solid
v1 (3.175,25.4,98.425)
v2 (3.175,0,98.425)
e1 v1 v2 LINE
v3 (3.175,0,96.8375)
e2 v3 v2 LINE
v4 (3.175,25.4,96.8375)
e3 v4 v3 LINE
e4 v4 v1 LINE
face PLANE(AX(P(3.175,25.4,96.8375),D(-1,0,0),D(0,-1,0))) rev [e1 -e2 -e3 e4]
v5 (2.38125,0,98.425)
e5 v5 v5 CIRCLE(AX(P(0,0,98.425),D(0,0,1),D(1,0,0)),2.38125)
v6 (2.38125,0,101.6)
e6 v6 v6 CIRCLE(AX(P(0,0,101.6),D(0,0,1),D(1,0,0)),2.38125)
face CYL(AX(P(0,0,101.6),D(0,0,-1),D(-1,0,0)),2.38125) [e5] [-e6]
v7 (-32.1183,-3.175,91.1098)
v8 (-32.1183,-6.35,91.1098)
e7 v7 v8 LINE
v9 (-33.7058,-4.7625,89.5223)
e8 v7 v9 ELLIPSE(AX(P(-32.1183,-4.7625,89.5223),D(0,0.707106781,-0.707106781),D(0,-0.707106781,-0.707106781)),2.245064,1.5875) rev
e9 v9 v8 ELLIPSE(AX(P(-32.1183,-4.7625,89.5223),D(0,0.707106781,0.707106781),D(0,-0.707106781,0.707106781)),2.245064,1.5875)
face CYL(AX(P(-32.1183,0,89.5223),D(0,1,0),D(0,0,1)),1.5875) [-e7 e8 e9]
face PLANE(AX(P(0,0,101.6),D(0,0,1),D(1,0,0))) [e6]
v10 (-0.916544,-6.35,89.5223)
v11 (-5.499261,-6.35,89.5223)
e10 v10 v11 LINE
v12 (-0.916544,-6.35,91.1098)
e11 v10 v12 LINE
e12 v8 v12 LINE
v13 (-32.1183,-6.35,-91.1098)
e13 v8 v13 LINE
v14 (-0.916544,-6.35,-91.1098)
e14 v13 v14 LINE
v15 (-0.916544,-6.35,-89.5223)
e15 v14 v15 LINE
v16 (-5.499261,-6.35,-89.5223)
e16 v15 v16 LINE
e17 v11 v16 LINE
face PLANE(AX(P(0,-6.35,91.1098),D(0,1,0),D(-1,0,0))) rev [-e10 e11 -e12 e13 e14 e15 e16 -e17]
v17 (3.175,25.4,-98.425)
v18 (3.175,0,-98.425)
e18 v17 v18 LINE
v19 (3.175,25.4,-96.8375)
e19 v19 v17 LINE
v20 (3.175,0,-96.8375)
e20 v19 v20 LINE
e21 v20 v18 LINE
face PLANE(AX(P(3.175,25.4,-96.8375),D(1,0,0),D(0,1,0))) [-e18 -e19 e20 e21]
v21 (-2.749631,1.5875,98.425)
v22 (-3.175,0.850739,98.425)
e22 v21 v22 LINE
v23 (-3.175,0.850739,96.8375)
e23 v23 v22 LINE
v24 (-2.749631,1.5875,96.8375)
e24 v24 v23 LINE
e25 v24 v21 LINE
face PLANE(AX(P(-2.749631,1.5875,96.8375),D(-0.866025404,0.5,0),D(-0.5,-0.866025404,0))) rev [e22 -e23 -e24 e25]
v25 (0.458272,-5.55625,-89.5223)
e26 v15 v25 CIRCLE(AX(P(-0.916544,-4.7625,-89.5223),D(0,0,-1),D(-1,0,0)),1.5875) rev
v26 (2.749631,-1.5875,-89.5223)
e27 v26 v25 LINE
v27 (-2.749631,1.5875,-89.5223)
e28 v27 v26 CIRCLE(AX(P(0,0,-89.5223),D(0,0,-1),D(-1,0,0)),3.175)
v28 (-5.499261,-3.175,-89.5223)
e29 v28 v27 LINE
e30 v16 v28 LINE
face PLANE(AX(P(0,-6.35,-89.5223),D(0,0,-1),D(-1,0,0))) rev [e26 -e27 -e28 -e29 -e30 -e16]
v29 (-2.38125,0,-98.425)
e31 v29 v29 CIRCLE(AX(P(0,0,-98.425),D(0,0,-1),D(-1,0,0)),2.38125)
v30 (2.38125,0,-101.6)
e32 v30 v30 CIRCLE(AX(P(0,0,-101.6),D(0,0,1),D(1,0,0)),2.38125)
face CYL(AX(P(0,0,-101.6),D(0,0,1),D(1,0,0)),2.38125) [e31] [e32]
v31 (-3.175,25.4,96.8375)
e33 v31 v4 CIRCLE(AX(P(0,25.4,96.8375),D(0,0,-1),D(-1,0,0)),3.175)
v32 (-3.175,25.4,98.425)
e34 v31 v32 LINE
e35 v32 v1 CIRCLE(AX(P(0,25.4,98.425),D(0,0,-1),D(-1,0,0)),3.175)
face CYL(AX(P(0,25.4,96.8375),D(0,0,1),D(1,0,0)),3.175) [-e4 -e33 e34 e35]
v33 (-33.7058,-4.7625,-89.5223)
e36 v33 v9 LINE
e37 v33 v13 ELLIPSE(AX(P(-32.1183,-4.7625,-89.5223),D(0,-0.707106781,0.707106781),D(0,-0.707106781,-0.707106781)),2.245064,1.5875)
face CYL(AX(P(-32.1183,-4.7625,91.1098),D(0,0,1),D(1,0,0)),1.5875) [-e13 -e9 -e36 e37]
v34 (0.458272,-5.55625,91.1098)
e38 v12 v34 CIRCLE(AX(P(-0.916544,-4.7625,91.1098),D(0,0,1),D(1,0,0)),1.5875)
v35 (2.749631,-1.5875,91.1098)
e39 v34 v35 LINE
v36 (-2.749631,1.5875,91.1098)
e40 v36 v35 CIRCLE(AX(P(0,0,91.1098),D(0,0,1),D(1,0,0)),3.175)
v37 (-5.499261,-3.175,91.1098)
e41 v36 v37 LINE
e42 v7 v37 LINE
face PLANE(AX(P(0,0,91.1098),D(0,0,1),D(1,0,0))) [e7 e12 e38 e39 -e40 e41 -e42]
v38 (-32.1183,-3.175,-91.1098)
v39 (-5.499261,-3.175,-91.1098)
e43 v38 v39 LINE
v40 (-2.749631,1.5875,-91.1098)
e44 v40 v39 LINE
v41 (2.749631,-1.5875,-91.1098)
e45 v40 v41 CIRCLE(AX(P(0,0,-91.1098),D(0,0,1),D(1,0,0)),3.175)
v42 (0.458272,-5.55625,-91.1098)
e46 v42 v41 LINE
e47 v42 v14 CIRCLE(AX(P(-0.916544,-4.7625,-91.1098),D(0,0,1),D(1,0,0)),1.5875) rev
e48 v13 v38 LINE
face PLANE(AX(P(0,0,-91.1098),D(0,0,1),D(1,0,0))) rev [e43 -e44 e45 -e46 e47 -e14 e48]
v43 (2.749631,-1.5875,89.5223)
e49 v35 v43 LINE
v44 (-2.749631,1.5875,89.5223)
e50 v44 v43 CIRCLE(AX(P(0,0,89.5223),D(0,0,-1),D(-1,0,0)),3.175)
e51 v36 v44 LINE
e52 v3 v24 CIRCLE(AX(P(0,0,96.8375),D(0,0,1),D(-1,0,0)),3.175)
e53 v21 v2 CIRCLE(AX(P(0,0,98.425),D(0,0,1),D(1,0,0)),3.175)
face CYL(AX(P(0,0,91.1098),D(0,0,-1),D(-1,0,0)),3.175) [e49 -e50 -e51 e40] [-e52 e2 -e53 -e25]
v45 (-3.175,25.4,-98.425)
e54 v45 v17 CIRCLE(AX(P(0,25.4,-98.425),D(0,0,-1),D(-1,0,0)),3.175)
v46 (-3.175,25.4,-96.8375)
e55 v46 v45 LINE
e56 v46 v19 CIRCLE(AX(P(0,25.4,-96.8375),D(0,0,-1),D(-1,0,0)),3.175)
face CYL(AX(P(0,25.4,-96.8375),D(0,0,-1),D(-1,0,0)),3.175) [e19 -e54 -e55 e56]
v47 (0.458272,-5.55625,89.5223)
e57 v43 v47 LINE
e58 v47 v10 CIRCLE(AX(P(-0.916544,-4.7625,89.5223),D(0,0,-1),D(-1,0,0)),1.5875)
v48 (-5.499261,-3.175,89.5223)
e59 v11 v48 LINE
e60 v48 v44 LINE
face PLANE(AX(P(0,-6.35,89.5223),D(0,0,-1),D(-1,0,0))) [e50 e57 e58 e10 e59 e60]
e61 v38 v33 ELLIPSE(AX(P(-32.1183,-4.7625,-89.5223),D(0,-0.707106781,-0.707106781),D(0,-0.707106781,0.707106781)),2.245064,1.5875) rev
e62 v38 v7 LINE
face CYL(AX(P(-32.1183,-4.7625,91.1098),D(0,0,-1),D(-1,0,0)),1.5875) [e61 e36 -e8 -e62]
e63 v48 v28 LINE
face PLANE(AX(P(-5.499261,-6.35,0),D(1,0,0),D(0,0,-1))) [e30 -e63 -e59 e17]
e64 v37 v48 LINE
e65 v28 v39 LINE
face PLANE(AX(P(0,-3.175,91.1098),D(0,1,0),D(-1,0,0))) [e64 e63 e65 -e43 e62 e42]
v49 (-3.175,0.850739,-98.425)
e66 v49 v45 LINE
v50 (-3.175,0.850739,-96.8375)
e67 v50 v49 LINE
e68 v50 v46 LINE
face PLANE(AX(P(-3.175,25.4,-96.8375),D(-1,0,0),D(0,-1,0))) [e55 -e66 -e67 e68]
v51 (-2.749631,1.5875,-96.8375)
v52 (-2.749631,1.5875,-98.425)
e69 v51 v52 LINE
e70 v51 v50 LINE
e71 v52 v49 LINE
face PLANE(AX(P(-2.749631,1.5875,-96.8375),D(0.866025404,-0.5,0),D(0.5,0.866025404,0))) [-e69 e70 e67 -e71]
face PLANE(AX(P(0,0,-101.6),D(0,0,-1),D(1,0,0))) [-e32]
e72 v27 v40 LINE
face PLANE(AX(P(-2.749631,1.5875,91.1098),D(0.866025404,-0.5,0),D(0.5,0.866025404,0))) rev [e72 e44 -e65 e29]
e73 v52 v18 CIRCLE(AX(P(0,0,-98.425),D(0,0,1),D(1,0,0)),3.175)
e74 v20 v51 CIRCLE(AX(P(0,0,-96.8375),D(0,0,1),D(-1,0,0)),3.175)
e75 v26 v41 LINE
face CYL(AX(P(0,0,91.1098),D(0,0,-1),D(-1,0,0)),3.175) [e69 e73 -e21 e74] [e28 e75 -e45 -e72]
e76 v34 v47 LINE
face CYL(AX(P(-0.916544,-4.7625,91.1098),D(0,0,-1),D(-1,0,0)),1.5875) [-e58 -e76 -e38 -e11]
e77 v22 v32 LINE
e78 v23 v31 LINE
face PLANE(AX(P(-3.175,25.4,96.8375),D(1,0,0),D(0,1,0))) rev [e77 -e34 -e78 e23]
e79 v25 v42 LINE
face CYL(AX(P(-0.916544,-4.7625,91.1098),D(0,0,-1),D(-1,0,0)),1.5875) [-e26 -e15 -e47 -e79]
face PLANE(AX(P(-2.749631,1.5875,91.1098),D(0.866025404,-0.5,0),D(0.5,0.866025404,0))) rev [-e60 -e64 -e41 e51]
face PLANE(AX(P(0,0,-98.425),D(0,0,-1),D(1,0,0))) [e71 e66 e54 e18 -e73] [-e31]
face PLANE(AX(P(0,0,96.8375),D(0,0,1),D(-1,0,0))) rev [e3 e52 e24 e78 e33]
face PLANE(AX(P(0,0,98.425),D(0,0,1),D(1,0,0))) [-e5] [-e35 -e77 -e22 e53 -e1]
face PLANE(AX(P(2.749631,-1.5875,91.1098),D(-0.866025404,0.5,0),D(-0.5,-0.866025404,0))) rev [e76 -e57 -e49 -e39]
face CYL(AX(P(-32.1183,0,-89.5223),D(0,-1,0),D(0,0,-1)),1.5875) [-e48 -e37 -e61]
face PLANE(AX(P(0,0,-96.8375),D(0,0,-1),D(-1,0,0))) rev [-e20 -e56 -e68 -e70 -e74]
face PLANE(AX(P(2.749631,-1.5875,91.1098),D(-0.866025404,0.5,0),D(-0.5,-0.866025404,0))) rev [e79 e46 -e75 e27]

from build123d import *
from build123d.topology import SkipClean

# Parameters (mm, degrees)
SKETCH1_R               = 3.175
SKETCH1_R_2             = 2.38125
BOSS_EXTRUDE1_DEPTH     = 91.1098
CUT_EXTRUDE1_DEPTH      = 98.351934288
CUT_EXTRUDE1_DEPTH_BACK = 98.351934288
FILLET1_R               = 1.5875
BOSS_EXTRUDE2_START     = 7.3152
SKETCH3_R               = 3.175
BOSS_EXTRUDE2_DEPTH     = 7.3152
SKETCH4_R               = 2.38125
BOSS_EXTRUDE3_DEPTH     = 3.175
BOSS_EXTRUDE4_START     = -1.5875
BOSS_EXTRUDE4_DEPTH     = 1.5875


with BuildPart() as part:
    # Sketch1 → Boss-Extrude1 (new, symmetric)
    # profile 1 of 3: a face of its own
    with BuildSketch(Plane.XY):
        with BuildLine():
            Line((-33.7058, -3.175), (-33.7058, -6.35))
            Line((-33.7058, -6.35), (0, -6.35))
            Line((0, -6.35), (2.749630657, -1.5875))
            ThreePointArc((2.749630657, -1.5875), (-1.5875, -2.749630657), (-2.749630657, 1.5875))
            Line((-2.749630657, 1.5875), (-5.499261314, -3.175))
            Line((-5.499261314, -3.175), (-33.7058, -3.175))
        make_face()
    # profile 2 of 3: a face of its own
    with BuildSketch(Plane.XY):
        Circle(SKETCH1_R)
        Circle(SKETCH1_R_2, mode=Mode.SUBTRACT)
    # profile 3 of 3: a face of its own
    with BuildSketch(Plane.XY):
        Circle(SKETCH1_R_2)
    extrude(amount=BOSS_EXTRUDE1_DEPTH, both=True)

    # Sketch2 → Cut-Extrude1 (cut, two sides: drawn at the far end of the back side and taken through both)
    with BuildSketch(Plane(origin=(0, 0, 0), x_dir=(1, 0, 0), z_dir=(0, 1, 0)).offset(-CUT_EXTRUDE1_DEPTH_BACK)):
        Polygon((-5.499261314, 89.5223), (-5.499261314, -89.5223), (3.175, -89.5223), (3.175, 0), (3.175, 89.5223), align=None)
    extrude(amount=CUT_EXTRUDE1_DEPTH + CUT_EXTRUDE1_DEPTH_BACK, mode=Mode.SUBTRACT)

    # Fillet1
    fillet1_edges = [part.edges().sort_by_distance(p)[0] for p in [
        (0, -6.35, 90.31605),
        (-33.7058, -6.35, 0),
        (-33.7058, -3.175, 0),
        (-33.7058, -4.7625, 91.1098),
        (0, -6.35, -90.31605),
        (-33.7058, -4.7625, -91.1098),
    ]]
    fillet(fillet1_edges, radius=FILLET1_R - 0.0001)  # a hair under: the kernel refuses the full size

    # Sketch3 → Boss-Extrude2 (add)
    with BuildSketch(Plane.XY.offset(91.1098).offset(BOSS_EXTRUDE2_START)):
        with Locations(Location((0, 0, 0), (0, 0, 150))):
            Circle(SKETCH3_R)
    boss_extrude2 = extrude(amount=-BOSS_EXTRUDE2_DEPTH)

    # Sketch4 → Boss-Extrude3 (add)
    with BuildSketch(Plane.XY.offset(98.425)):
        Circle(SKETCH4_R)
    boss_extrude3 = extrude(amount=BOSS_EXTRUDE3_DEPTH)

    # Mirror1: Boss-Extrude2, Boss-Extrude3 across plane
    with SkipClean():  # the faces are left unmerged after this step: merging them gives an invalid solid
        add(boss_extrude2.mirror(Plane.XY))
        add(boss_extrude3.mirror(Plane.XY))

    # Sketch6 → Boss-Extrude4 (add)
    with SkipClean():  # the faces are left unmerged after this step: merging them gives an invalid solid
        with BuildSketch(Plane(origin=(0, 0, -98.425), x_dir=(-1, 0, 0), z_dir=(0, 0, -1)).offset(BOSS_EXTRUDE4_START)):
            with BuildLine():
                Line((2.749630657, 1.5875), (3.175, 0.850738686))
                Line((3.175, 0.850738686), (3.175, 25.4))
                ThreePointArc((3.175, 25.4), (0, 28.575), (-3.175, 25.4))
                Line((-3.175, 25.4), (-3.175, 0))
                ThreePointArc((-3.175, 0), (-0.821750468, 3.066814498), (2.749630657, 1.5875))
            make_face()
        boss_extrude4 = extrude(amount=BOSS_EXTRUDE4_DEPTH)

    # Mirror2: Boss-Extrude4 across plane
    with SkipClean():  # the faces are left unmerged after this step: merging them gives an invalid solid
        add(boss_extrude4.mirror(Plane.XY))


solid = part.part
